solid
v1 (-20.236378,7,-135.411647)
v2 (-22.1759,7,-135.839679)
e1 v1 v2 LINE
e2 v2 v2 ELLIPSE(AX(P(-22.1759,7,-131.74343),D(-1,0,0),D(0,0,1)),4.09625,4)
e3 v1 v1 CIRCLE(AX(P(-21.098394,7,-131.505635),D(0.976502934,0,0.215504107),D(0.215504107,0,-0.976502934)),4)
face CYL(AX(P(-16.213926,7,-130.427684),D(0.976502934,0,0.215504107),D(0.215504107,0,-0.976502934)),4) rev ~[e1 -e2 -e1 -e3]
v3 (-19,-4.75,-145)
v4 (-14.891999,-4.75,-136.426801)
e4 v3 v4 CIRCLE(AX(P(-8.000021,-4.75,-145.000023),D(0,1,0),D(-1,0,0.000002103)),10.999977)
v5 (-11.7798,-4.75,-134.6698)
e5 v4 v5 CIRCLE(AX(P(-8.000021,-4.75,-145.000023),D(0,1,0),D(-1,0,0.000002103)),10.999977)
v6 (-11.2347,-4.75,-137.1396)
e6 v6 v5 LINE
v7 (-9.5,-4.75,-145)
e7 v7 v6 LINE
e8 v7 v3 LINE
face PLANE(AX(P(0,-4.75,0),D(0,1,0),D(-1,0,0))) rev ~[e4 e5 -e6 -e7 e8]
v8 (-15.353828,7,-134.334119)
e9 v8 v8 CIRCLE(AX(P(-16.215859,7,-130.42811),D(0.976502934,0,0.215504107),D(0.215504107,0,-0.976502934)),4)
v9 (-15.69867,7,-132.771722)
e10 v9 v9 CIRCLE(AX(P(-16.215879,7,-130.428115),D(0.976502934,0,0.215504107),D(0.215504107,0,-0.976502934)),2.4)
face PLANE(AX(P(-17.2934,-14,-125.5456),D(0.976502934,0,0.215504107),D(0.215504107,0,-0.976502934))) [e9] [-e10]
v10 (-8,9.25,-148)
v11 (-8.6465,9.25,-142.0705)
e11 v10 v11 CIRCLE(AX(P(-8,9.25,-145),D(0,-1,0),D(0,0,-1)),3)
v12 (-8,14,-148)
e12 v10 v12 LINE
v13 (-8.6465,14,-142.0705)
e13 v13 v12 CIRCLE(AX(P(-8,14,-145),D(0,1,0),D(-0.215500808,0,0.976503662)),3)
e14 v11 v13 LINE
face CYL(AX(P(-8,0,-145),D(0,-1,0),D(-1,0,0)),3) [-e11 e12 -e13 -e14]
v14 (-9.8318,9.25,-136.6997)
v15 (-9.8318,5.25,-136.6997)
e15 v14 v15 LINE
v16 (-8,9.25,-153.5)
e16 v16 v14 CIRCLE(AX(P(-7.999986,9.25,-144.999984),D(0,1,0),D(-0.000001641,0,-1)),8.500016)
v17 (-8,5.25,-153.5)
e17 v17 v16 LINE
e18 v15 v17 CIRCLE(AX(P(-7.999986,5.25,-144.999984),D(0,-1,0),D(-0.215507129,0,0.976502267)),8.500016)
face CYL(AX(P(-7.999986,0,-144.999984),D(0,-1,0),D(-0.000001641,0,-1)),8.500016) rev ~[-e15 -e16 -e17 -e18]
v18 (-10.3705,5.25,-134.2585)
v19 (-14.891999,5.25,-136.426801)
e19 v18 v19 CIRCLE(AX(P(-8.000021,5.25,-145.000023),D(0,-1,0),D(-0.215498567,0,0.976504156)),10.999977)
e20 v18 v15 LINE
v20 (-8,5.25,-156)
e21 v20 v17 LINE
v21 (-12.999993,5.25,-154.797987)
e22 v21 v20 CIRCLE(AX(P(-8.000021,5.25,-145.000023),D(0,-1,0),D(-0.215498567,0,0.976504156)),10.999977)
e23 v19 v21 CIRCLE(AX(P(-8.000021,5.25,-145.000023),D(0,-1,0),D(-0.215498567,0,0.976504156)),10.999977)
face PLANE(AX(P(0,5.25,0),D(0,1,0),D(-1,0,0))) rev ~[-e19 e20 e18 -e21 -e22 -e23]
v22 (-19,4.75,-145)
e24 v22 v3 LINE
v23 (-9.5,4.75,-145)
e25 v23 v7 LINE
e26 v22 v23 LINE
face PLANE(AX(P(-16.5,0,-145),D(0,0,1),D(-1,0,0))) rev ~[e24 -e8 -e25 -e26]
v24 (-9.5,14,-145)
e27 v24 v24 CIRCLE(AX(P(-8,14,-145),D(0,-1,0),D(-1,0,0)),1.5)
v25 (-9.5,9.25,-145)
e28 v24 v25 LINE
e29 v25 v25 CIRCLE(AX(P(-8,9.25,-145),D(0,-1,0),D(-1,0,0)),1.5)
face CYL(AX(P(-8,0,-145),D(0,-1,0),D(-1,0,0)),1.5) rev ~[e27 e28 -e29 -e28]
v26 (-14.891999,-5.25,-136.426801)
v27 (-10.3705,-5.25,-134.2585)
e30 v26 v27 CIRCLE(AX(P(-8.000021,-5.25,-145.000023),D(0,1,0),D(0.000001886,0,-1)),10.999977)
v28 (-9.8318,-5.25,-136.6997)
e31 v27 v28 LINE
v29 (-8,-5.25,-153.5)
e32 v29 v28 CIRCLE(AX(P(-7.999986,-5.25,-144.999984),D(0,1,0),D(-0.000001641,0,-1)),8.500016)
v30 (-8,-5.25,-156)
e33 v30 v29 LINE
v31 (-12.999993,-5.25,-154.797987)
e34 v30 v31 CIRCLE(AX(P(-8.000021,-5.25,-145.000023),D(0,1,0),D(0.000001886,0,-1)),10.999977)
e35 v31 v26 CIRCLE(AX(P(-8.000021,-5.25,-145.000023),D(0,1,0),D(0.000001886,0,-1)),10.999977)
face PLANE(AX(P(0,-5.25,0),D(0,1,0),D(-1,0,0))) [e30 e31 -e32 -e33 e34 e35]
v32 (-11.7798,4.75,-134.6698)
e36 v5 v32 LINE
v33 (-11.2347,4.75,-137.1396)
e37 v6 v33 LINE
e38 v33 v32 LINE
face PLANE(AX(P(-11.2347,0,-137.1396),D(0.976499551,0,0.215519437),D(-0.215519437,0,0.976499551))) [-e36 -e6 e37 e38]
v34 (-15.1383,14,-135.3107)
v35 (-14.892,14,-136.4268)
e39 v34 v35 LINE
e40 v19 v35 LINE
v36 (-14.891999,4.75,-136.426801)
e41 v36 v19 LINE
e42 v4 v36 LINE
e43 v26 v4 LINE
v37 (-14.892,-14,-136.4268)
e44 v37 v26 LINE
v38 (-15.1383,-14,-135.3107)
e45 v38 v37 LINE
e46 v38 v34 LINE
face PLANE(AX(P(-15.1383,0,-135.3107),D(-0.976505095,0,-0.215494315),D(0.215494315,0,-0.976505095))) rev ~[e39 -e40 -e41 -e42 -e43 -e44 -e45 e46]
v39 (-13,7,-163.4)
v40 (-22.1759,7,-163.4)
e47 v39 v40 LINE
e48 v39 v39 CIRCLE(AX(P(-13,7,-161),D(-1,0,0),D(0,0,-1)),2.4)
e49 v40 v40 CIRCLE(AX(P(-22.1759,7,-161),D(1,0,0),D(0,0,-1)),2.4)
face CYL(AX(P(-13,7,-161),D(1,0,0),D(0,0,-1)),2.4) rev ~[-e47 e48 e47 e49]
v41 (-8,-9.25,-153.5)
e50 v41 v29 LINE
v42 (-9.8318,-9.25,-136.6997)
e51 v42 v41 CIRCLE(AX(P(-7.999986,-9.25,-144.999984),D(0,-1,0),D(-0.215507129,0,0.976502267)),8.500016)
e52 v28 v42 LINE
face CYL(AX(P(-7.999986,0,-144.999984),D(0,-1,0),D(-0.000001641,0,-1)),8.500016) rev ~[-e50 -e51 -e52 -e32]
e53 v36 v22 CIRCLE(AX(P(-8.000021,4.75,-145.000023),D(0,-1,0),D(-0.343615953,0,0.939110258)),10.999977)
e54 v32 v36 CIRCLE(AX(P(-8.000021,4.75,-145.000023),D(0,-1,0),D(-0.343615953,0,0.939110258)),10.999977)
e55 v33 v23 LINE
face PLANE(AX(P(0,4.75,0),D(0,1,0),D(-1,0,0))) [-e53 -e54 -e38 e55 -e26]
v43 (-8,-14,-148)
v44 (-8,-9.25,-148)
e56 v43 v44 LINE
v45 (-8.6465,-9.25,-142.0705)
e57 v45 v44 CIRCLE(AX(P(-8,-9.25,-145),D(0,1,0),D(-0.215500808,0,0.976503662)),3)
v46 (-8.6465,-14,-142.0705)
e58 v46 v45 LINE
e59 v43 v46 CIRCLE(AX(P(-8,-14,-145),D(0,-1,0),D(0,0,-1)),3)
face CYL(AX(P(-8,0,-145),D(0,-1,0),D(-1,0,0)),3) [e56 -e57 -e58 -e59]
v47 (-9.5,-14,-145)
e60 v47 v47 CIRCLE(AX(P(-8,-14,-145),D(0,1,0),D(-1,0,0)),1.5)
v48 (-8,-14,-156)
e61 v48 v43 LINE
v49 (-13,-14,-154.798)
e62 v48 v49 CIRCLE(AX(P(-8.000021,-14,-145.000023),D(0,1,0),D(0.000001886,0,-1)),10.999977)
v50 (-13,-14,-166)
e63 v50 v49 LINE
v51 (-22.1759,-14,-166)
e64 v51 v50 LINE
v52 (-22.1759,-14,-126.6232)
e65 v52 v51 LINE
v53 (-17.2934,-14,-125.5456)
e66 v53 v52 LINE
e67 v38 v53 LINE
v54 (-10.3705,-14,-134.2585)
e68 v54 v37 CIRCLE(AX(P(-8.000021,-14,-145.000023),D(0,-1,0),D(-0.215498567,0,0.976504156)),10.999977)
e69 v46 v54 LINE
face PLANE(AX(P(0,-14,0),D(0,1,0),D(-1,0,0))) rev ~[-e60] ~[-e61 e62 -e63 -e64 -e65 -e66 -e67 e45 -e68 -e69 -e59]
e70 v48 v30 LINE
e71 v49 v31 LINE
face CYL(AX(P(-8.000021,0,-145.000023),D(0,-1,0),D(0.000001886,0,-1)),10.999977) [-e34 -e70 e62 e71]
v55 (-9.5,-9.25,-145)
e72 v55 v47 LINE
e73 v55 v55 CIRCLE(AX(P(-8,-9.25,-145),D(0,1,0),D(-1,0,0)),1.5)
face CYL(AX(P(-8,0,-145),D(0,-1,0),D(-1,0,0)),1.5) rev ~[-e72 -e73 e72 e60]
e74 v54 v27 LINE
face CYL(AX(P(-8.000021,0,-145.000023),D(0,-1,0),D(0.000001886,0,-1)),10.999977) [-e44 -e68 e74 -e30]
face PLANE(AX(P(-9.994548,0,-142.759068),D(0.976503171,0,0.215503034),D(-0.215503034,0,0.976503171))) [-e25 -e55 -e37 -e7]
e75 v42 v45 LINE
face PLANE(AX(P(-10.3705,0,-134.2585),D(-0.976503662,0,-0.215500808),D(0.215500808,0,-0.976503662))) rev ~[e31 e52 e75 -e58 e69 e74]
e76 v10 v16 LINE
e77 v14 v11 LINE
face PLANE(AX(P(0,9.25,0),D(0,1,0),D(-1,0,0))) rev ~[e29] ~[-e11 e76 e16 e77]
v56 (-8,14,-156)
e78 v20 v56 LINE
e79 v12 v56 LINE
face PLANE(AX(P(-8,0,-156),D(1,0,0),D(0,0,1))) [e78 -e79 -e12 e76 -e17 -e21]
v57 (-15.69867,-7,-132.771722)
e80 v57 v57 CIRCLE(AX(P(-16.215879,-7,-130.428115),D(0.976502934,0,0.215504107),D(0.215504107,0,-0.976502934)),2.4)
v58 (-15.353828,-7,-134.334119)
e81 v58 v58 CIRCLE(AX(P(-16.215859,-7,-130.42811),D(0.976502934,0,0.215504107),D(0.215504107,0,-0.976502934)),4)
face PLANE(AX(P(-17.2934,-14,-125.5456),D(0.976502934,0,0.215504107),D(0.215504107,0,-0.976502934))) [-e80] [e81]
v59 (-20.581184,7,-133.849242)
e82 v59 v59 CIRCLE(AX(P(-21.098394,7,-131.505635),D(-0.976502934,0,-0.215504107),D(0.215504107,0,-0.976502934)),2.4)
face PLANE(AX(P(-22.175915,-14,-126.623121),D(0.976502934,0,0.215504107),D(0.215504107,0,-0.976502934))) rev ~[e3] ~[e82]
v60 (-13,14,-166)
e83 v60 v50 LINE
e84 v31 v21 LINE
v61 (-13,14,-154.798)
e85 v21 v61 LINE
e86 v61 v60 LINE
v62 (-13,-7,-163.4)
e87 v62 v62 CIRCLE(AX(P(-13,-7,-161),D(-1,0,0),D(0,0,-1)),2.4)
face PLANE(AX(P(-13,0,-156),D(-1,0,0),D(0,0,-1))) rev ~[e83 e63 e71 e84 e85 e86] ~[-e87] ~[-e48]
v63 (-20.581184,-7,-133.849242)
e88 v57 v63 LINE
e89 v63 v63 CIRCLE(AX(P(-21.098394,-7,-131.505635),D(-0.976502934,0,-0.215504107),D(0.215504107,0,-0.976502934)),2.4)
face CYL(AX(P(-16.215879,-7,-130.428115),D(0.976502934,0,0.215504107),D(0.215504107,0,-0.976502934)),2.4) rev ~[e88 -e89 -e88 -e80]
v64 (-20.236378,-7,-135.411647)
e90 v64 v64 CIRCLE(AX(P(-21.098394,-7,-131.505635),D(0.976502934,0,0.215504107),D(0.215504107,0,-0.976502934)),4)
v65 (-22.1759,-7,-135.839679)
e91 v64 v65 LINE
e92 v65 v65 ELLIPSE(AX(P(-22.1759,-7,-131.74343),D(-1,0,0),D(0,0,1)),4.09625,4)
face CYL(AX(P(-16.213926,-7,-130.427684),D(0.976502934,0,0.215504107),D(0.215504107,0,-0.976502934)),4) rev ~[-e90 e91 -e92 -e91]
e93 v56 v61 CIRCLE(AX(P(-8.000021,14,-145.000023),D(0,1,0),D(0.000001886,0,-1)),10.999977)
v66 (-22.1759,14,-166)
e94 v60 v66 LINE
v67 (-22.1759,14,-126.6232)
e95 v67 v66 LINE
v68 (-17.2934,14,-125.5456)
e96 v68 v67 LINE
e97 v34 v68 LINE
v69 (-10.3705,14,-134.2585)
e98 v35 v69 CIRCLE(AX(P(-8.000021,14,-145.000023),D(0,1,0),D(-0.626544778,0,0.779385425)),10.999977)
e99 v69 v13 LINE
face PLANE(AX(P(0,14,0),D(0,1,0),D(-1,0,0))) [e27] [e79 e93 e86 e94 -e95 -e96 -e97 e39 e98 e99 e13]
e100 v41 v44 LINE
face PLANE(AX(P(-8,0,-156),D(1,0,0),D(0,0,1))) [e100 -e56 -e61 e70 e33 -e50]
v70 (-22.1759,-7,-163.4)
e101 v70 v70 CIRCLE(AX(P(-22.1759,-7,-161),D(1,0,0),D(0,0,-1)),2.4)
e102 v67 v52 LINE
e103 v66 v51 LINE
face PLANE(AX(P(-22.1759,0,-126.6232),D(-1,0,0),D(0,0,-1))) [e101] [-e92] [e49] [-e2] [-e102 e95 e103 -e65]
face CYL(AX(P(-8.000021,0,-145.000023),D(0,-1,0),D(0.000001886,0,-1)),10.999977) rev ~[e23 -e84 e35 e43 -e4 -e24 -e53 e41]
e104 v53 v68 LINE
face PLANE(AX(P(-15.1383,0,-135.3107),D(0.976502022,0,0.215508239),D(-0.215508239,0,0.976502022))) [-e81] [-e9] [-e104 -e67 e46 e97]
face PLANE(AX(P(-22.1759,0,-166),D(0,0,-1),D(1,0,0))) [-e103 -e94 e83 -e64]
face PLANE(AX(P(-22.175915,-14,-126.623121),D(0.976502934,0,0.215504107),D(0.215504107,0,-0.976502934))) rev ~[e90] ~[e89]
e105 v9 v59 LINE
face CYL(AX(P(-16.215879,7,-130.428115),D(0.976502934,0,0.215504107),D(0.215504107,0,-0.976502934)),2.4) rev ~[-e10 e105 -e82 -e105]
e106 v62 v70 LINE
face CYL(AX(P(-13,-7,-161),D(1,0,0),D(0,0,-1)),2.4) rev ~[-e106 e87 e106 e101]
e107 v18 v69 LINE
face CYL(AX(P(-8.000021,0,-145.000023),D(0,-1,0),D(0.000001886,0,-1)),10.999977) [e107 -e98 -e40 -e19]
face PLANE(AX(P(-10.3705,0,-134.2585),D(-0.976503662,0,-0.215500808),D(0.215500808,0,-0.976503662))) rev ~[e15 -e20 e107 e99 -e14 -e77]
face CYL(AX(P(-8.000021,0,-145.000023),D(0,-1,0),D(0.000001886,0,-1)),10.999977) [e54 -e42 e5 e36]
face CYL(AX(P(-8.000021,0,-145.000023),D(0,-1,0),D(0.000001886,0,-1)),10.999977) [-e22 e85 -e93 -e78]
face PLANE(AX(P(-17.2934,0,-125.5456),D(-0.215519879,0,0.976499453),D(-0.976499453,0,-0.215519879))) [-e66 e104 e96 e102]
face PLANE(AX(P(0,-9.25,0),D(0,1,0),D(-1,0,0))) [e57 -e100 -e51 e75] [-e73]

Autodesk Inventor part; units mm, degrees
ref_plane "YZ Plane" through (0, 0, 0) normal (1, 0, 0) x (0, 1, 0)
ref_plane "XZ Plane" through (0, 0, 0) normal (0, 1, 0) x (-1, 0, 0)
ref_plane "XY Plane" through (0, 0, 0) normal (0, 0, 1) x (1, 0, 0)
sketch "Sketch1" plane through (0, 0, 0) normal (0, 1, 0) x (-1, 0, 0)
  line L0 (0, 0) -> (0, -145)
  line L1 (0, -145) -> (3, -145)
  line L2 (3, -145) -> (8, -145)
  circle A0 centre (8, -145) radius 1.5
  line L3 (0, 0) -> (40, 0)
  line L4 (0, -145) -> (0, -250)
  line L5 (0, -250) -> (8, -250)
  line L6 (8, -156) -> (8, -148)
  circle A1 centre (8, -145) radius 3
  line L7 (13, -250) -> (8, -250)
  line L8 (8, -156) -> (13, -156)
  line L9 (13, -156) -> (13, -166)
  line L10 (10.3705, -134.2585) -> (15.1383, -135.3107)
  line L11 (15.1383, -135.3107) -> (14.892, -136.4268)
  line L12 (15.1383, -135.3107) -> (17.2934, -125.5456)
  line L13 (17.2934, -125.5456) -> (12.5256, -124.4934)
  line L14 (17.2934, -125.5456) -> (22.1759, -126.6232)
  line L15 (13, -166) -> (18, -166)
  line L16 (22.1759, -126.6232) -> (22.1759, -166)
  line L17 (22.1759, -166) -> (18, -166)
  arc A2 (0, -137.4502) -> (0, -152.5498) centre (8, -145) ccw
  arc A3 (8, -156) -> (10.3705, -134.2585) centre (8, -145) ccw
  line L18 (40, 0) -> (12.5256, -124.4934)
  line L19 (10.3705, -134.2585) -> (8.6465, -142.0705)
  line L20 (8, -148) -> (8, -153)
  arc A4 (0, -142.1277) -> (0, -147.8723) centre (8, -145) ccw
  arc A5 (8, -153.5) -> (9.8318, -136.6997) centre (8, -145) ccw
  line L21 (8, -153.5) -> (8, -156)
  line L22 (9.8318, -136.6997) -> (10.3705, -134.2585)
  line L23 (9.5, -145) -> (11.2347, -137.1396)
  line L24 (9.5, -145) -> (16.5, -145)
  line L25 (13, -156) -> (13, -154.798)
  line L26 (16.5, -145) -> (19, -145)
  line L27 (11.2347, -137.1396) -> (11.7798, -134.6698)
  dimension "d4" = 3
  dimension "d0" = 145
  dimension "d1" = 3
  dimension "d2" = 5
  dimension "d5" = 40
  dimension "d6" = 105
  dimension "d8" = 6
  dimension "d10" = 10
  dimension "d11" = 10
  dimension "d12" = 5
  dimension "d13" = 5
extrude "Extrusion4" add sketch "Sketch1" along normal mid plane 28 contours L14 L16 L17 L15 L9 L25 A3 L11 L12 | A1 L23 A0 L2 | L2 A0 L24 A1 | A3 L27 A5 L19 | A3 L26 A5 L27 | L19 A5 L23 A1 | A1 L24 A5 L6 | A3 L6 A5 L26 | L23 A1 L24 | L23 A5 L24 A1
extrude "Extrusion5" cut sketch "Sketch1" along normal mid plane 18.5 contours A1 L23 A0 L2 | L2 A0 L24 A1 | L19 A5 L23 A1 | A1 L24 A5 L6 | L23 A1 L24 | L23 A5 L24 A1
extrude "Extrusion6" cut sketch "Sketch1" along normal mid plane 10.5 contours A3 L27 A5 L19 | A3 L26 A5 L27 | A3 L6 A5 L26
extrude "Extrusion7" add sketch "Sketch1" along normal mid plane 9.5 contours A3 L26 A5 L27 | L23 A1 L24 | L23 A5 L24 A1
sketch "Sketch2" plane through (-17.2934, -14, -125.5456) normal (0.9765029, 0, 0.2155041) x (0.2155041, 0, -0.9765029)
  line L0 (0, 28) -> (0, 14)
  line L1 (0, 0) -> (0, 28) projected
  line L2 (0, 14) -> (5, 14)
  line L3 (5, 14) -> (5, 21)
  line L4 (5, 14) -> (5, 7)
  circle A0 centre (5, 21) radius 2.4
  circle A1 centre (5, 7) radius 2.4
  circle A2 centre (5, 21) radius 4
  circle A3 centre (5, 7) radius 4
  point P0 (-118.8689, 14)
  dimension "d29" = 5
  dimension "d30" = 7
  dimension "d31" = 7
  dimension "d32" = 4.8
  dimension "d33" = 4.8
  dimension "d34" = 8
  dimension "d35" = 8
extrude "Extrusion8" cut sketch "Sketch2" against normal blind 10.5 contours A0 | A1 | A2 | A3
extrude "Extrusion9" add sketch "Sketch2" against normal blind 5
sketch "Sketch3" plane through (-13, -14, -166) normal (1, 0, 0) x (0, 0, -1)
  line L0 (0, 28) -> (0, 14)
  line L1 (0, 0) -> (0, 28) projected
  line L2 (0, 14) -> (-5, 14)
  line L3 (-5, 14) -> (-5, 21)
  line L4 (-5, 14) -> (-5, 7)
  circle A0 centre (-5, 21) radius 2.4
  circle A1 centre (-5, 7) radius 2.4
  point P0 (-166, 14)
  dimension "d40" = 5
  dimension "d41" = 7
  dimension "d42" = 7
  dimension "d43" = 4.8
  dimension "d44" = 4.8
extrude "Extrusion10" cut sketch "Sketch3" against normal blind 10
properties part number "push_clip"
